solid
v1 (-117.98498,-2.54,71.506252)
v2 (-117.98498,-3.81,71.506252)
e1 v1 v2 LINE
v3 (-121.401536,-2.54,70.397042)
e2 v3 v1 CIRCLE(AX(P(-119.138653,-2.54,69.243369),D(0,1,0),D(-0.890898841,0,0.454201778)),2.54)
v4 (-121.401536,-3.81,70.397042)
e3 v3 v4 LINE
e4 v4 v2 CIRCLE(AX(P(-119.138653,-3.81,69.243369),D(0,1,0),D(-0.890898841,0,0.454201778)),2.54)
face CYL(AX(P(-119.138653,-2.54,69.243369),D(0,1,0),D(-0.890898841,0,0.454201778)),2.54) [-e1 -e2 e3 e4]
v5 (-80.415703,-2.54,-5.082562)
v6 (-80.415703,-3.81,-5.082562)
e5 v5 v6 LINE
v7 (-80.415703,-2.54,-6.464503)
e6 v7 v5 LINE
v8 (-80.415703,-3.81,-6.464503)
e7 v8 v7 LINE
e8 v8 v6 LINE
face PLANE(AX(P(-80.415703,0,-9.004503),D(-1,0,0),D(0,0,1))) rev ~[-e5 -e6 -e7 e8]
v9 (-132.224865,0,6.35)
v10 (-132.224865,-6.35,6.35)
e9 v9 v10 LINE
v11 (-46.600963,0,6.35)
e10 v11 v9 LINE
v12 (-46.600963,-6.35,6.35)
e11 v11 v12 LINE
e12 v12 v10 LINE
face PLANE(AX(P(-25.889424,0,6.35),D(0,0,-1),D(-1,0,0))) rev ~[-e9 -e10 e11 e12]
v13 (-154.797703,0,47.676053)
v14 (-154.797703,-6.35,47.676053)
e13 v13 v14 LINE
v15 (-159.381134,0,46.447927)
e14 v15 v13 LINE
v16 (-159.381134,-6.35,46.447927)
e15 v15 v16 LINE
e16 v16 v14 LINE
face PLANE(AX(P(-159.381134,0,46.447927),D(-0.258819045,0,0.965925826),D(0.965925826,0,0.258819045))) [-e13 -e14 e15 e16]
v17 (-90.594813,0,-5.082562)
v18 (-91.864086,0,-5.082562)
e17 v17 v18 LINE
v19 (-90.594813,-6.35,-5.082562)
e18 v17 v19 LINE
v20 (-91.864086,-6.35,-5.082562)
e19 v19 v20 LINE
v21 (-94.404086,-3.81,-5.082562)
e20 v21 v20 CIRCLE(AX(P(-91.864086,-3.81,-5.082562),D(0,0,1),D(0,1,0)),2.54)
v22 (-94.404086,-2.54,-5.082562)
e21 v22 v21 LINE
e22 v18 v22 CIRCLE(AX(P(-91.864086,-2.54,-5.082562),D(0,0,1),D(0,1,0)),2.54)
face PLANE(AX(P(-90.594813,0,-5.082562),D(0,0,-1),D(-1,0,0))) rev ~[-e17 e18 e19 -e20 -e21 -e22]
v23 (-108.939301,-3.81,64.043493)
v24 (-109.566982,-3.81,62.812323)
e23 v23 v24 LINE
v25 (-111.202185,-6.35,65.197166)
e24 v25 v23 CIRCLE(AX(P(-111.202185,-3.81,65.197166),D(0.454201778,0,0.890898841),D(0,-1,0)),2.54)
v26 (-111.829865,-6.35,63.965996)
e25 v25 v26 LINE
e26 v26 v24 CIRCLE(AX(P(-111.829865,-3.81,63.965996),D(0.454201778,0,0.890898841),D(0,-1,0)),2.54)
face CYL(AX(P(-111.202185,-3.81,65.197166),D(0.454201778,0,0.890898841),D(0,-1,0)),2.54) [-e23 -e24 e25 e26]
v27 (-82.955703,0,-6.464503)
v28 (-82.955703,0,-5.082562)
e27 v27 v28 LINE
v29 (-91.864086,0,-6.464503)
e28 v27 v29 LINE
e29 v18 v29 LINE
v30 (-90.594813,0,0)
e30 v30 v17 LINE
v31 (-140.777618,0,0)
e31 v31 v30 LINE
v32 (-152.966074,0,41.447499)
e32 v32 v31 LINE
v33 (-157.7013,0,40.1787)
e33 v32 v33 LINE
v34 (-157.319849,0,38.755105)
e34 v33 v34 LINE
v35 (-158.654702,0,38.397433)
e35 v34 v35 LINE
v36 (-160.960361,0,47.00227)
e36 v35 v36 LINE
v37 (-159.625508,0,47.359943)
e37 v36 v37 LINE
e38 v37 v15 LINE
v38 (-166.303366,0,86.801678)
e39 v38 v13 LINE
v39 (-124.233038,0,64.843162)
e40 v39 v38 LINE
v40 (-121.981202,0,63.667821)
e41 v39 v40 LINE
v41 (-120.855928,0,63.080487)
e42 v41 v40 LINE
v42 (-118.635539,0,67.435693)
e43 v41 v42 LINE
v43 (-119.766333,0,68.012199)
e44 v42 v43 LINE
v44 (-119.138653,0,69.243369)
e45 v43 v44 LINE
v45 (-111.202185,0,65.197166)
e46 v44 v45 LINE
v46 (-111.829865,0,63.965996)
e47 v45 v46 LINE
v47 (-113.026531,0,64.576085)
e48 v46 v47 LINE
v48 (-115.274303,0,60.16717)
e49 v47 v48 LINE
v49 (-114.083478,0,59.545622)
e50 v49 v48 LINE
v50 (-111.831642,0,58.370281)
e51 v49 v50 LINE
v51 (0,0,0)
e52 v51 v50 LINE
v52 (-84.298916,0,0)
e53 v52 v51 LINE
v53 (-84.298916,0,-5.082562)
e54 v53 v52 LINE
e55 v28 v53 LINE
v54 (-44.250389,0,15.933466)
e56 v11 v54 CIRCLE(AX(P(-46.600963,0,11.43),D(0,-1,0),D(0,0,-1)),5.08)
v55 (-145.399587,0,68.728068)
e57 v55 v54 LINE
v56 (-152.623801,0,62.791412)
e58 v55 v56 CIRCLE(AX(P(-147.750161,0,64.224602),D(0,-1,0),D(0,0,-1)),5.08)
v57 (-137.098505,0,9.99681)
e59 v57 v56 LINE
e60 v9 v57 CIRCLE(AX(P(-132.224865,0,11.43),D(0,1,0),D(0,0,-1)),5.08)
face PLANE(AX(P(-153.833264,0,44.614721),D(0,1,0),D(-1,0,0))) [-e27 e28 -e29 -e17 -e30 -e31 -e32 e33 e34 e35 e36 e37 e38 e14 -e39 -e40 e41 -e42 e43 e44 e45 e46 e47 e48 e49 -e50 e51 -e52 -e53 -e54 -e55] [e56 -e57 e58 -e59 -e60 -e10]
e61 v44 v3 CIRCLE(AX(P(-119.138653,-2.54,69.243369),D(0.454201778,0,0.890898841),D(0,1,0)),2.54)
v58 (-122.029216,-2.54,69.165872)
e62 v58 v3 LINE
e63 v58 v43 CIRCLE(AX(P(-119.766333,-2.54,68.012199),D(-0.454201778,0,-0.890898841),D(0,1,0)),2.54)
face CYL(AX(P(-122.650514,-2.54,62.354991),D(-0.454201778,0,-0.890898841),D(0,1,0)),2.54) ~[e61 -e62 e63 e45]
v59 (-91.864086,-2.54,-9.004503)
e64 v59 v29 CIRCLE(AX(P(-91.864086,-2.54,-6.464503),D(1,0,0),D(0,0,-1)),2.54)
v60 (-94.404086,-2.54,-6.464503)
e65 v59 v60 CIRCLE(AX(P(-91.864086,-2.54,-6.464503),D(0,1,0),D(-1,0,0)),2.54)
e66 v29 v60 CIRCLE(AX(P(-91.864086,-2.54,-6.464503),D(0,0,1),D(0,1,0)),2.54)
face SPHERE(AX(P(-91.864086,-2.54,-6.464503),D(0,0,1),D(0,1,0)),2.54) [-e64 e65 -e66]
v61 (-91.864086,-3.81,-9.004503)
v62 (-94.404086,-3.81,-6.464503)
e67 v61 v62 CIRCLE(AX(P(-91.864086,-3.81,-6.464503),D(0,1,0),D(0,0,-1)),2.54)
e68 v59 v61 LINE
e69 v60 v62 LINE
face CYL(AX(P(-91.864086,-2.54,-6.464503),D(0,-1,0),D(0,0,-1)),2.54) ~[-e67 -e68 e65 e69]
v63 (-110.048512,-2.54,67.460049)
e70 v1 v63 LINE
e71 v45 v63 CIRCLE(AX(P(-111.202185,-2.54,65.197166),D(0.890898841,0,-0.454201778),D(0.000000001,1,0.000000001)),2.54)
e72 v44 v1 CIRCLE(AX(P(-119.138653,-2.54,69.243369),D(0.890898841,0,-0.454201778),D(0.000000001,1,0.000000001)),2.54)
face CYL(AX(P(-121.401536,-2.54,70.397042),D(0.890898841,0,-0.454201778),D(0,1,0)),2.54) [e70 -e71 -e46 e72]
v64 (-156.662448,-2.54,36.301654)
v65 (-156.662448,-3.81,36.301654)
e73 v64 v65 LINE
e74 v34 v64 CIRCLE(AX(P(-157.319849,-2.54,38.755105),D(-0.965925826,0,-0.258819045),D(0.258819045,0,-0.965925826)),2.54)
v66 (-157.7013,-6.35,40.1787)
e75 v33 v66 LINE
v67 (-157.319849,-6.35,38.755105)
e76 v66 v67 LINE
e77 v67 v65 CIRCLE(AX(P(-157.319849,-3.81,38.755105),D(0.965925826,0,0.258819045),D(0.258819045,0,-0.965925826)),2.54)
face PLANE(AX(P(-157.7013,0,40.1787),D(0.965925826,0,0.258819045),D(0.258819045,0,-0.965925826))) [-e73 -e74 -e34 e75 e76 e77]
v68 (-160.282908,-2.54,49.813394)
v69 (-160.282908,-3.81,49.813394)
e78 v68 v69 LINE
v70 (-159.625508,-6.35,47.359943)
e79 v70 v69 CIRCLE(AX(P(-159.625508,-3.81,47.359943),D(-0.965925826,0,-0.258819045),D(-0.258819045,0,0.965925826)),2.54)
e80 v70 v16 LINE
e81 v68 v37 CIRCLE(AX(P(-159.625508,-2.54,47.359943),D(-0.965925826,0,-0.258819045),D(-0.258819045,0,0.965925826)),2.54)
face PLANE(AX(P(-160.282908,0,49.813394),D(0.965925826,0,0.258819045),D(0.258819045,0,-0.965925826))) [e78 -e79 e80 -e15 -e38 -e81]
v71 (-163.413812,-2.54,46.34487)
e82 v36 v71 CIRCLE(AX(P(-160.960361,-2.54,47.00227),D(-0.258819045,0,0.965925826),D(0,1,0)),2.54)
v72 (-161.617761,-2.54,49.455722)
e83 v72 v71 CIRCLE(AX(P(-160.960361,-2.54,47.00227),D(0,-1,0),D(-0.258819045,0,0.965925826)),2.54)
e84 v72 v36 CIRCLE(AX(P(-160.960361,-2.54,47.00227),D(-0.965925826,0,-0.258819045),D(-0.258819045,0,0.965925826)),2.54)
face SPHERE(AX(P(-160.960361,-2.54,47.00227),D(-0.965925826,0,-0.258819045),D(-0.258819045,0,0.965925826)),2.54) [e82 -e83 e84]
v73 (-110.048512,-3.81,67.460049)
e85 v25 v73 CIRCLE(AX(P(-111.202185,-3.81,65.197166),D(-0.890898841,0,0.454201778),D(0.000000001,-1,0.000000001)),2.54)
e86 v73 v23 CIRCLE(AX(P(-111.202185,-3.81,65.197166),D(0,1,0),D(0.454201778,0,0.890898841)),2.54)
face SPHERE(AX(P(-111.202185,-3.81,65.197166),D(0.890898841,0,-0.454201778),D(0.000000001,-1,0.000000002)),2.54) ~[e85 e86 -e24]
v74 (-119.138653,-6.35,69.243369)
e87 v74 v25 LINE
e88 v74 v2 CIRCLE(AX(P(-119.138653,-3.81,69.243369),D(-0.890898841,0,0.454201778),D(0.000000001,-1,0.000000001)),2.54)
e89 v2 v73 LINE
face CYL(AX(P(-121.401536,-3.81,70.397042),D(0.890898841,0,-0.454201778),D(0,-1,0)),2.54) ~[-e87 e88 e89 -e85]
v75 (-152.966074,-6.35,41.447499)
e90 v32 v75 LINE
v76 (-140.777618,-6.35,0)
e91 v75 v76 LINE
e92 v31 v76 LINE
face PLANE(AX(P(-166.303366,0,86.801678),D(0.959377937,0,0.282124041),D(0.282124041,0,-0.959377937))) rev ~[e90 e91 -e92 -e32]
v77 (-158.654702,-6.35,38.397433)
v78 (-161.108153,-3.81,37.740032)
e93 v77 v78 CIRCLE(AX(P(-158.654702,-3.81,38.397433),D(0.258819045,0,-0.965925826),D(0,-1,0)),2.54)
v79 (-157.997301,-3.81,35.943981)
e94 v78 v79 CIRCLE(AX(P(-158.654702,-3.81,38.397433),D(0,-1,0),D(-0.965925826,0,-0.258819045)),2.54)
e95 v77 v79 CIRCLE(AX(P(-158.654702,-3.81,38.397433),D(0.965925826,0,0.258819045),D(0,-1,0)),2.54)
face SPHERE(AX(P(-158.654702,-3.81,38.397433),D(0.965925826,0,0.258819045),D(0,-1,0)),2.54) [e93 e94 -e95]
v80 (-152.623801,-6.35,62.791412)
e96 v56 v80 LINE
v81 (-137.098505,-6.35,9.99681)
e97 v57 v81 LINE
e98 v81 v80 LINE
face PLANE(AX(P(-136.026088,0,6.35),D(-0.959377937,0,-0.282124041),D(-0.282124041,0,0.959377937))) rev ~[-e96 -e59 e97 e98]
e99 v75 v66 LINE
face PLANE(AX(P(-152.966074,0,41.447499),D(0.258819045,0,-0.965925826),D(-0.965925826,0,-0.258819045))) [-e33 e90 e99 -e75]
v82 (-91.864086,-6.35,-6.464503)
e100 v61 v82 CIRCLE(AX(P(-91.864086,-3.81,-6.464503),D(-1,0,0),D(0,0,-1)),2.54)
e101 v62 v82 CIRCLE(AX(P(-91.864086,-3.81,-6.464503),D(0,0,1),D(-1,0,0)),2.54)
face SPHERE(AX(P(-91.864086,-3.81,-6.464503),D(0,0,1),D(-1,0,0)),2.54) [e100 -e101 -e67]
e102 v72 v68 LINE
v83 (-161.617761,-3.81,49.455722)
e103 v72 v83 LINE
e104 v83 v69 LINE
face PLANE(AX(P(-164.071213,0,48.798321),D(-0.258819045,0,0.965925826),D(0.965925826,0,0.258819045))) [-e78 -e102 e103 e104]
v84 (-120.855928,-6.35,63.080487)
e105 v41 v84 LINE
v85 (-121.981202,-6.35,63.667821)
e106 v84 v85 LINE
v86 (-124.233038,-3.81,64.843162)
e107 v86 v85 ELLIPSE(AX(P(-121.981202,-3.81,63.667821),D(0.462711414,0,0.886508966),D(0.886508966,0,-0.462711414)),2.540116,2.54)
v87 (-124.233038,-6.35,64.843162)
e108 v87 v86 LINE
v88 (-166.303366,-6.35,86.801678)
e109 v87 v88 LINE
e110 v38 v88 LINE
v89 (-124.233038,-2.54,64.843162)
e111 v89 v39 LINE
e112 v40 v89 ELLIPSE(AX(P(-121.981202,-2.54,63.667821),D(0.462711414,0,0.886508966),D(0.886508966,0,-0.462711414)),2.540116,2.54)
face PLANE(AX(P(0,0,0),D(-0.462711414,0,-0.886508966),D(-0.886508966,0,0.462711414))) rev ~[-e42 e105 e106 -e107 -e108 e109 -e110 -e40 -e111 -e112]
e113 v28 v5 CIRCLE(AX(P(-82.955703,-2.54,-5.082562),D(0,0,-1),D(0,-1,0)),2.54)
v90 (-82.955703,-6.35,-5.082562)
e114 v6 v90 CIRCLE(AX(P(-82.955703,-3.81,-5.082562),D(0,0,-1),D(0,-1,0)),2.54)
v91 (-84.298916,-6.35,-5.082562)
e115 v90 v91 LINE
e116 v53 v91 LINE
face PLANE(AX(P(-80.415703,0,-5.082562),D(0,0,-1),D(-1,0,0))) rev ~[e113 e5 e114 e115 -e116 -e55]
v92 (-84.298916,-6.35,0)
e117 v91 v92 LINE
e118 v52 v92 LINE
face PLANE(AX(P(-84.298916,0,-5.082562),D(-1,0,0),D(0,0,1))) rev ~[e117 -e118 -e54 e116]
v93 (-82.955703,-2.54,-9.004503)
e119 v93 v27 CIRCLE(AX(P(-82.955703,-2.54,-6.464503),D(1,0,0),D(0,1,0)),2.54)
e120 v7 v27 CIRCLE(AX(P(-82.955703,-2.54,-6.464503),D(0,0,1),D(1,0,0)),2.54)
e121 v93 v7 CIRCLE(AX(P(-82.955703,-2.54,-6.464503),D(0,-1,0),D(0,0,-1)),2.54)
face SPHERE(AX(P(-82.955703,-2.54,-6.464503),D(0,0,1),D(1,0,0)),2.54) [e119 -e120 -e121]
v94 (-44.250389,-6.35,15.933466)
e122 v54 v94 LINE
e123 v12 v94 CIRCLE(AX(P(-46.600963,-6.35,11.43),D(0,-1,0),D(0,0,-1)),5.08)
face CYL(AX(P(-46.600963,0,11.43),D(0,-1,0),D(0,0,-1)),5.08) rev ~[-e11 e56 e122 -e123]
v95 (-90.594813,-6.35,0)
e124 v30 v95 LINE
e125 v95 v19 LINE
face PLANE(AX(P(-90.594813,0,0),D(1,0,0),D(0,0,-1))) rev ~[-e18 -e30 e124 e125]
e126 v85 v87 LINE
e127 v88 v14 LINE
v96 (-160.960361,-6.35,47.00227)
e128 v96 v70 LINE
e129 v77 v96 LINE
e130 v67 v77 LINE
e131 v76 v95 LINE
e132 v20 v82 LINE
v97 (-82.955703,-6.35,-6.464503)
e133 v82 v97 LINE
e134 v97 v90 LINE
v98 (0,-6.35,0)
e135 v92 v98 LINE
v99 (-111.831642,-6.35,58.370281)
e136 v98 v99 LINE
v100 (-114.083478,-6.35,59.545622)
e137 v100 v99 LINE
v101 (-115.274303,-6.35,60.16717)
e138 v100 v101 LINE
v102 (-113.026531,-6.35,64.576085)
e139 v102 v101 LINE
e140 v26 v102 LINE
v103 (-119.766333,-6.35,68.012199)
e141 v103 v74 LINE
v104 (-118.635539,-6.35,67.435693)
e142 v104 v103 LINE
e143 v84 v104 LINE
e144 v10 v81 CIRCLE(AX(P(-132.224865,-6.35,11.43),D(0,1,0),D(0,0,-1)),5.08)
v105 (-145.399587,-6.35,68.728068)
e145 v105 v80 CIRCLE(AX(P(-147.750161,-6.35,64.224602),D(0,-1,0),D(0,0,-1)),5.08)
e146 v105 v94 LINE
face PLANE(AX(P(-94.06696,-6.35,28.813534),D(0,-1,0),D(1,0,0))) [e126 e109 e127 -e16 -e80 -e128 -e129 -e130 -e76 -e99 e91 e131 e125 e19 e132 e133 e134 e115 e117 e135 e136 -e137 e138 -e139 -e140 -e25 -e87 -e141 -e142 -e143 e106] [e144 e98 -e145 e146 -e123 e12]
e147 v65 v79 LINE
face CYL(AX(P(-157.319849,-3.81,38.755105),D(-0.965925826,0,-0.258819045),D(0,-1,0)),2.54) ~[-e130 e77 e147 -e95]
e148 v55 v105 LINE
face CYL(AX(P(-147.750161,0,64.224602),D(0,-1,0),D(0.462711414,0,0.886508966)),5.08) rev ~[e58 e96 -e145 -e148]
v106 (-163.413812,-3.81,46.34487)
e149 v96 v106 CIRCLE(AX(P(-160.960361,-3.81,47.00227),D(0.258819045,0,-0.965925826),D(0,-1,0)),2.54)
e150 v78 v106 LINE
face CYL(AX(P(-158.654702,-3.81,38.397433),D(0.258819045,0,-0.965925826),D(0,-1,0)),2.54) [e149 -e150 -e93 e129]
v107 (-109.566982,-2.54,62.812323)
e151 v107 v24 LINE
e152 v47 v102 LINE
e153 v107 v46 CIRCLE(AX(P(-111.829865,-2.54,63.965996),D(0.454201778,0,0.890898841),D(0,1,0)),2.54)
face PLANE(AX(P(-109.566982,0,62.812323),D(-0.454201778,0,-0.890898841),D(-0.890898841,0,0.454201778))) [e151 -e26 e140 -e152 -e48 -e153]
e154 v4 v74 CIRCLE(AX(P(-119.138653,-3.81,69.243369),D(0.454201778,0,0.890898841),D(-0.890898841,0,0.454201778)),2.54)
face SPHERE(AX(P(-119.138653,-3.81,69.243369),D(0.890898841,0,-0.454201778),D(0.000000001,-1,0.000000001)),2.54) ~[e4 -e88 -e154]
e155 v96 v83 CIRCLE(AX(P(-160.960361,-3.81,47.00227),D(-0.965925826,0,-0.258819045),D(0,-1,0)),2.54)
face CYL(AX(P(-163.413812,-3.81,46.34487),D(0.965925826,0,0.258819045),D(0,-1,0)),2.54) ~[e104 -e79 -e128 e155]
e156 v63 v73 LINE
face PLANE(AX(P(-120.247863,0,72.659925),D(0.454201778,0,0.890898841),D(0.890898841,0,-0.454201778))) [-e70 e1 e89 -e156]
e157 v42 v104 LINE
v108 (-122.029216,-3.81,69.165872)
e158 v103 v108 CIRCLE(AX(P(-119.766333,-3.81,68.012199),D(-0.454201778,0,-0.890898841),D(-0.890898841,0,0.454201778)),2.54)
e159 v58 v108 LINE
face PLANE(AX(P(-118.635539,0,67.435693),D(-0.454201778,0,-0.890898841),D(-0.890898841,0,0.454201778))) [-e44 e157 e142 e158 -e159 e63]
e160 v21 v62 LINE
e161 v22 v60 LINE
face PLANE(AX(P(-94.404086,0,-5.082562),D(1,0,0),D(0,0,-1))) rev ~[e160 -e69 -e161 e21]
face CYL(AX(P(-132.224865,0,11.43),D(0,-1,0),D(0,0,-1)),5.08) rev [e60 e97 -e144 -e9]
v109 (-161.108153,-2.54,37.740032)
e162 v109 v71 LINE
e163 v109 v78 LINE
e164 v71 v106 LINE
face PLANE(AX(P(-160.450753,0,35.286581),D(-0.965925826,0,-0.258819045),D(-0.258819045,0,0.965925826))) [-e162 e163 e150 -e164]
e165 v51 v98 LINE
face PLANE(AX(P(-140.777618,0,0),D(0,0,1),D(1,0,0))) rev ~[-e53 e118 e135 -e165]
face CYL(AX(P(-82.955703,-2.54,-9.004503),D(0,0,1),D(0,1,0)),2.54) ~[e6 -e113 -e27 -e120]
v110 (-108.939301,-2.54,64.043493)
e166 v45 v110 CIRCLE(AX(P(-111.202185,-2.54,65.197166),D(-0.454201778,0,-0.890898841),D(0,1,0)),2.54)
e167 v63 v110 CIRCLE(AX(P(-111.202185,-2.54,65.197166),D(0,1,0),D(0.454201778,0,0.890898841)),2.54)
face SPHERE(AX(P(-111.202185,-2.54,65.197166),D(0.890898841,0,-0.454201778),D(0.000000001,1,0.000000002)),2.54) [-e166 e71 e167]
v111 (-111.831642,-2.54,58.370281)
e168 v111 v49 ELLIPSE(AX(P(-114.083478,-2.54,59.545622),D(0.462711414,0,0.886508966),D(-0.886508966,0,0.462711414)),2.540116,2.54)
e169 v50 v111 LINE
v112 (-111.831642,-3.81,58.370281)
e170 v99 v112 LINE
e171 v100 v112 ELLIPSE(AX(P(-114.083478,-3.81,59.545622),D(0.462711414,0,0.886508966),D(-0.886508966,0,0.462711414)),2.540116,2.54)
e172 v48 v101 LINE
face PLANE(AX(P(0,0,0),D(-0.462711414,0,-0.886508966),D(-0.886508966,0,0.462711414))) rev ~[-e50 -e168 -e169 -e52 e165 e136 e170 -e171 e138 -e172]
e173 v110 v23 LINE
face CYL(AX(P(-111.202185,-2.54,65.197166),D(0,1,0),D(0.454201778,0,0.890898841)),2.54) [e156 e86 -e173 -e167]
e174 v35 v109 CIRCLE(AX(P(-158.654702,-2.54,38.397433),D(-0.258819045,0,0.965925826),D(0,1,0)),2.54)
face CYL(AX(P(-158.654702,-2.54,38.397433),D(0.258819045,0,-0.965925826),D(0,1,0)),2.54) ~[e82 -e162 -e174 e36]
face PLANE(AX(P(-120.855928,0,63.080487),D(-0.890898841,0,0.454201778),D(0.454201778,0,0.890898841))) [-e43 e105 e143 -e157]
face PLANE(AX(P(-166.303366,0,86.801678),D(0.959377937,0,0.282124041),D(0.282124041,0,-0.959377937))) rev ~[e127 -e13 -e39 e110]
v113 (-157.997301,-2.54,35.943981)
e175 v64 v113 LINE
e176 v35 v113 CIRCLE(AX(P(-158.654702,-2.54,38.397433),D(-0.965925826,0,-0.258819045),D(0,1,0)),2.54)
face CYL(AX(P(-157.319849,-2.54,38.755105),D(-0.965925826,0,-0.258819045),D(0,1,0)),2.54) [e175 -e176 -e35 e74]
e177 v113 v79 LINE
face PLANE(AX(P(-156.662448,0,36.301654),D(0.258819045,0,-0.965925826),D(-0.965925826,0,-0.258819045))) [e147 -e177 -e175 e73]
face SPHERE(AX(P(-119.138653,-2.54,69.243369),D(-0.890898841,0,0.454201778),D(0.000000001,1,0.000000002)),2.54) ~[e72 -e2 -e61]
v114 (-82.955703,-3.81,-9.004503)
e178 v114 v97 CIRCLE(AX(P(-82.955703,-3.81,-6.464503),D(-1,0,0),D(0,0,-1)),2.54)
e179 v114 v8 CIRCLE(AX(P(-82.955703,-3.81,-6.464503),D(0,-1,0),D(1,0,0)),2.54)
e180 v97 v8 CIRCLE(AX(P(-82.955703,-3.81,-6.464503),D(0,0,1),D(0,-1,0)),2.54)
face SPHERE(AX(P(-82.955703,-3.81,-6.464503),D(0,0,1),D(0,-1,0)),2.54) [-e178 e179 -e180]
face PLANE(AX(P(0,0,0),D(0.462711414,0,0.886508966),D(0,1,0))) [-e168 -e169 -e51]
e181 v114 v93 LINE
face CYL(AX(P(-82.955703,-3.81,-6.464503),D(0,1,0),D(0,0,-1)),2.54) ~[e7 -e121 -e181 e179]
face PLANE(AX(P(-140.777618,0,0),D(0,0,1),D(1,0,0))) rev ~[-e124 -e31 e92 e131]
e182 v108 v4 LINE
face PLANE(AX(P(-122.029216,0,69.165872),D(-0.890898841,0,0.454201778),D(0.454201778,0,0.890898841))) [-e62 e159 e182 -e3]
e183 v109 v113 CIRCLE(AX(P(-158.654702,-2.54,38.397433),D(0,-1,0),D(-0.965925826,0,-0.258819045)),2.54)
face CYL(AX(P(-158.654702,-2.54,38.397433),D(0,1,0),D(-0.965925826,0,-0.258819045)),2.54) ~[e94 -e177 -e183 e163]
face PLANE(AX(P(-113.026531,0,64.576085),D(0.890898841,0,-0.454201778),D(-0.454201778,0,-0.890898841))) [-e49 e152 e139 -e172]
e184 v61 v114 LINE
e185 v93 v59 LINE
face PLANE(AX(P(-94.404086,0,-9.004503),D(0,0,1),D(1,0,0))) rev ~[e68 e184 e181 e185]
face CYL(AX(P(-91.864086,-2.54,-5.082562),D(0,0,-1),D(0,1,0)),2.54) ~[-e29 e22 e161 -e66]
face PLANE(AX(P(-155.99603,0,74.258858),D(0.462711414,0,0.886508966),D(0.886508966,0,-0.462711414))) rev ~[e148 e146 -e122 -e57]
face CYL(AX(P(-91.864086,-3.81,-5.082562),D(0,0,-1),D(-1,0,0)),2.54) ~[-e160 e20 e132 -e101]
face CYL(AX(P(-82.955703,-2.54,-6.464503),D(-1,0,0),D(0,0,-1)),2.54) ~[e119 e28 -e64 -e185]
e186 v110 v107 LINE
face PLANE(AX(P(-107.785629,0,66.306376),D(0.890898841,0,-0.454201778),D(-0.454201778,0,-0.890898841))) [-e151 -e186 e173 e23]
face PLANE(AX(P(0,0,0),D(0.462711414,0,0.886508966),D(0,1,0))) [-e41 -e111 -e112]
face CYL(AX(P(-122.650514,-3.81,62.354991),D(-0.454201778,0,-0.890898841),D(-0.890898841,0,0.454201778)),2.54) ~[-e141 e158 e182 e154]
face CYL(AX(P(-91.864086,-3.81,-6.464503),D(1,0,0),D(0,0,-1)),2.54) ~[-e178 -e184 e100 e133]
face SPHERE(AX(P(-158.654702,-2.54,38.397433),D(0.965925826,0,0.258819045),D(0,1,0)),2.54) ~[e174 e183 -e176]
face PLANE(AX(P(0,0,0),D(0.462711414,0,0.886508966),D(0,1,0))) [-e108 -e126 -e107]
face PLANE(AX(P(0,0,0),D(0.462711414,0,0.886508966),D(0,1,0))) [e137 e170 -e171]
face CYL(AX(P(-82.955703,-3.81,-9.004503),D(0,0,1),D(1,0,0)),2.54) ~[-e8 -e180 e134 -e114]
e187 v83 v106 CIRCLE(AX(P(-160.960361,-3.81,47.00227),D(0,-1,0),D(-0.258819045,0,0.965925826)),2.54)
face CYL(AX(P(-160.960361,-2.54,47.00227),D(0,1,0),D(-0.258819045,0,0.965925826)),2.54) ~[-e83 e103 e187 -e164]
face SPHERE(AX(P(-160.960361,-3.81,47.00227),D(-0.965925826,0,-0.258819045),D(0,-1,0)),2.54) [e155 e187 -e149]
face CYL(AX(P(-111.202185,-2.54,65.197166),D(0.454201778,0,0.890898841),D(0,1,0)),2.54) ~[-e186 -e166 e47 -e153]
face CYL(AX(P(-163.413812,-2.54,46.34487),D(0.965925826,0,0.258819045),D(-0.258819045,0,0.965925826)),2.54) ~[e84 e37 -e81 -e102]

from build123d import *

# Parameters (mm, degrees)
F1_DEPTH      = 6.35
F2_R          = 5.08
F4_DEPTH      = 6.35
F5_R          = 2.54
F6_R          = 2.54
F7_R          = 2.54
F8_R          = 2.54
F10_DEPTH     = 6.35
F11_R         = 2.54
F12_R         = 2.54
F13_T1_DEPTH  = 8.9083831143
F13_T3_DEPTH  = 1.27
F13_T6_ANGLE  = 90
F13_T8_ANGLE  = 90
F13_T10_ANGLE = 90
F13_T12_ANGLE = 90
F15_DEPTH     = 6.35
F16_R         = 2.54
F17_T1_DEPTH  = 1.27
F17_T4_ANGLE  = 90
F17_T6_ANGLE  = 90
F17_T10_DEPTH = 7.7319413884
F17_T15_DEPTH = 7.7319413884
F18_T1_DEPTH  = 1.27
F18_T4_ANGLE  = 90
F18_T8_DEPTH  = 7.7319413884
F18_T13_DEPTH = 7.7319413884
F18_T16_ANGLE = 90


# Not quite as in the source:
# - a fillet or chamfer that OpenCascade refuses, or shapes differently, is made with other operations: its cross-section is extruded or revolved along the edge and cut away or added


with BuildPart() as f1:
    # F0 (on Front) → F1 (new body)
    with BuildSketch(Plane.XZ):
        Polygon((-140.7776176929, 0), (0, 0), (-166.3033664227, 86.8016779423), align=None)
        Polygon((-136.0260884312, 6.35), (-155.9960301785, 74.2588582448), (-25.8894239036, 6.35), align=None, mode=Mode.SUBTRACT)
    extrude(amount=F1_DEPTH)

    # F2
    f2_edges = [f1.edges().sort_by_distance(p)[0] for p in [
        (-155.99603, -3.175, 74.258858),
        (-25.889424, -3.175, 6.35),
        (-136.026088, -3.175, 6.35),
    ]]
    fillet(f2_edges, radius=F2_R)

    # F3 (on Front) → F4 (join)
    with BuildSketch(Plane.XZ):
        Polygon((-84.2989161611, 0), (-90.5948132277, 0), (-90.5948132277, -5.0825621001), (-94.4040864706, -5.0825621001), (-94.4040864706, -9.0045034885), (-80.4157033563, -9.0045034885), (-80.4157033563, -5.0825621001), (-84.2989161611, -5.0825621001), align=None)
    extrude(amount=F4_DEPTH)

    # F5
    f5_edges = [f1.edges().sort_by_distance(p)[0] for p in [
        (-80.415703, 0, -7.043533),
    ]]
    fillet(f5_edges, radius=F5_R)

    # F6
    f6_edges = [f1.edges().sort_by_distance(p)[0] for p in [
        (-94.404086, 0, -7.043533),
    ]]
    fillet(f6_edges, radius=F6_R)

    # F7
    f7_edges = [f1.edges().sort_by_distance(p)[0] for p in [
        (-94.404086, -6.35, -7.043533),
        (-80.415703, -6.35, -7.043533),
    ]]
    fillet(f7_edges, radius=F7_R)

    # F8
    f8_edges = [f1.edges().sort_by_distance(p)[0] for p in [
        (-87.409895, -6.35, -9.004503),
        (-87.409895, 0, -9.004503),
    ]]
    fillet(f8_edges, radius=F8_R)

    # F9 (on face) → F10 (join)
    with BuildSketch(Plane(origin=(0, 0, 0), x_dir=(-1, 0, 0), z_dir=(0, 1, 0))):
        Polygon((154.6036799573, 47.7280417937), (152.9238455726, 41.4588145216), (152.9660739724, 41.4474994559), (154.7977033408, 47.6760533848), align=None)
        Polygon((154.7977033408, 47.6760533848), (152.9660739724, 41.4474994559), (157.7012996051, 40.1786995717), (156.6624483483, 36.3016538997), (160.4507528245, 35.2865807746), (164.0712127847, 48.7983212928), (160.2829083085, 49.8133944179), (159.3811339898, 46.4479268438), align=None)
    extrude(amount=-F10_DEPTH)

    # F11
    f11_edges = [f1.edges().sort_by_distance(p)[0] for p in [
        (-162.177061, -6.35, 49.305858),
        (-158.556601, -6.35, 35.794117),
    ]]
    fillet(f11_edges, radius=F11_R)

    # F12
    f12_edges = [f1.edges().sort_by_distance(p)[0] for p in [
        (-162.177061, 0, 49.305858),
        (-158.556601, 0, 35.794117),
    ]]
    fillet(f12_edges, radius=F12_R)

    # F13: fillet of radius 2.54 on 6 edges, made by hand

    # F13_s2 → F13_t1 (cut)
    with BuildSketch(Plane(origin=(-20.2272079793, 0, 75.488967874), x_dir=(0, 1, 0), z_dir=(-0.2588190451, 0, 0.9659258263))):
        with BuildLine():
            ThreePointArc((0, 143.3106868597), (-0.7439487758, 145.1067380839), (-2.54, 145.8506868597))
            Line((-2.54, 145.8506868597), (0, 145.8506868597))
            Line((0, 145.8506868597), (0, 143.3106868597))
        make_face()
        with BuildLine():
            ThreePointArc((-6.35, 143.3106868597), (-5.6060512242, 145.1067380839), (-3.81, 145.8506868597))
            Line((-3.81, 145.8506868597), (-6.35, 145.8506868597))
            Line((-6.35, 145.8506868597), (-6.35, 143.3106868597))
        make_face()
    extrude(amount=F13_T1_DEPTH, mode=Mode.SUBTRACT)

    # F13_s4 → F13_t3 (cut)
    with BuildSketch(Plane.XZ.offset(2.54)):
        with BuildLine():
            ThreePointArc((-161.1081531991, 37.7400323734), (-159.9247016003, 36.1977282224), (-157.9973012258, 35.9439811492))
            Line((-157.9973012258, 35.9439811492), (-160.4507528245, 35.2865807746))
            Line((-160.4507528245, 35.2865807746), (-161.1081531991, 37.7400323734))
        make_face()
        with BuildLine():
            ThreePointArc((-161.617761186, 49.4557216674), (-163.160065337, 48.2722700686), (-163.4138124102, 46.344869694))
            Line((-163.4138124102, 46.344869694), (-164.0712127847, 48.7983212928))
            Line((-164.0712127847, 48.7983212928), (-161.617761186, 49.4557216674))
        make_face()
    extrude(amount=F13_T3_DEPTH, mode=Mode.SUBTRACT)

    # F13_s5 → F13_t6 (revolve, cut)
    with BuildSketch(Plane.XZ.offset(2.54)):
        with BuildLine():
            ThreePointArc((-161.617761186, 49.4557216674), (-163.160065337, 48.2722700686), (-163.4138124102, 46.344869694))
            Line((-163.4138124102, 46.344869694), (-164.0712127847, 48.7983212928))
            Line((-164.0712127847, 48.7983212928), (-161.617761186, 49.4557216674))
        make_face()
    revolve(axis=Axis((-163.4138124102, -2.54, 46.344869694), (-0.9659258263, 0, -0.2588190451)), revolution_arc=F13_T6_ANGLE, mode=Mode.SUBTRACT)

    # F13_s7 → F13_t8 (revolve, cut)
    with BuildSketch(Plane(origin=(-22.5328671904, 0, 84.0938051946), x_dir=(0, 1, 0), z_dir=(0.2588190451, 0, -0.9659258263))):
        with BuildLine():
            ThreePointArc((-6.35, -143.3106868597), (-5.6060512242, -145.1067380839), (-3.81, -145.8506868597))
            Line((-3.81, -145.8506868597), (-6.35, -145.8506868597))
            Line((-6.35, -145.8506868597), (-6.35, -143.3106868597))
        make_face()
    revolve(axis=Axis((-163.4138124102, -3.81, 46.344869694), (-0.9659258263, 0, -0.2588190451)), revolution_arc=F13_T8_ANGLE, mode=Mode.SUBTRACT)

    # F13_s9 → F13_t10 (revolve, cut)
    with BuildSketch(Plane(origin=(-20.2272079793, 0, 75.488967874), x_dir=(0, 1, 0), z_dir=(-0.2588190451, 0, 0.9659258263))):
        with BuildLine():
            ThreePointArc((-3.81, 145.8506868597), (-5.6060512242, 145.1067380839), (-6.35, 143.3106868597))
            Line((-6.35, 143.3106868597), (-6.35, 145.8506868597))
            Line((-6.35, 145.8506868597), (-3.81, 145.8506868597))
        make_face()
    revolve(axis=Axis((-161.1081531991, -3.81, 37.7400323734), (0.9659258263, 0, 0.2588190451)), revolution_arc=F13_T10_ANGLE, mode=Mode.SUBTRACT)

    # F13_s11 → F13_t12 (revolve, cut)
    with BuildSketch(Plane(origin=(-20.2272079793, 0, 75.488967874), x_dir=(0, 1, 0), z_dir=(-0.2588190451, 0, 0.9659258263))):
        with BuildLine():
            ThreePointArc((-2.54, 145.8506868597), (-0.7439487758, 145.1067380839), (0, 143.3106868597))
            Line((0, 143.3106868597), (0, 145.8506868597))
            Line((0, 145.8506868597), (-2.54, 145.8506868597))
        make_face()
    revolve(axis=Axis((-161.1081531991, -2.54, 37.7400323734), (-0.9659258263, 0, -0.2588190451)), revolution_arc=F13_T12_ANGLE, mode=Mode.SUBTRACT)

    # F14 (on face) → F15 (join)
    with BuildSketch(Plane(origin=(0, 0, 0), x_dir=(-1, 0, 0), z_dir=(0, 1, 0))):
        Polygon((115.2743030785, 60.1671700704), (120.8559281551, 63.0804870568), (118.6355388683, 67.435692909), (122.0292159852, 69.1658715892), (120.2478632331, 72.6599246264), (107.7856289299, 66.3063761433), (109.5669816821, 62.8123231061), (113.026531469, 64.5760852667), align=None)
    extrude(amount=-F15_DEPTH)

    # F16
    f16_edges = [f1.edges().sort_by_distance(p)[0] for p in [
        (-114.016746, -6.35, 69.48315),
        (-114.016746, 0, 69.48315),
    ]]
    fillet(f16_edges, radius=F16_R)

    # F17: fillet of radius 2.54 on 4 edges, made by hand

    # F17_s2 → F17_t1 (cut)
    with BuildSketch(Plane.XZ.offset(2.54)):
        with BuildLine():
            ThreePointArc((-121.4015357494, 70.3970415704), (-119.9229829878, 71.6592386675), (-117.9849801771, 71.50625211))
            Line((-117.9849801771, 71.50625211), (-120.2478632331, 72.6599246264))
            Line((-120.2478632331, 72.6599246264), (-121.4015357494, 70.3970415704))
        make_face()
    extrude(amount=F17_T1_DEPTH, mode=Mode.SUBTRACT)

    # F17_s3 → F17_t4 (revolve, cut)
    with BuildSketch(Plane(origin=(3.4409642411, 0, 6.7493153968), x_dir=(0, 1, 0), z_dir=(-0.4542017781, 0, -0.8908988409))):
        with BuildLine():
            ThreePointArc((0, -137.5909489404), (-0.7439487758, -139.3870001646), (-2.54, -140.1309489404))
            Line((-2.54, -140.1309489404), (0, -140.1309489404))
            Line((0, -140.1309489404), (0, -137.5909489404))
        make_face()
    revolve(axis=Axis((-121.4015357494, -2.54, 70.3970415704), (0.8908988409, 0, -0.4542017781)), revolution_arc=F17_T4_ANGLE, mode=Mode.SUBTRACT)

    # F17_s5 → F17_t6 (revolve, cut)
    with BuildSketch(Plane(origin=(3.4409642411, 0, 6.7493153968), x_dir=(0, 1, 0), z_dir=(-0.4542017781, 0, -0.8908988409))):
        with BuildLine():
            ThreePointArc((-3.81, -140.1309489404), (-5.6060512242, -139.3870001646), (-6.35, -137.5909489404))
            Line((-6.35, -137.5909489404), (-6.35, -140.1309489404))
            Line((-6.35, -140.1309489404), (-3.81, -140.1309489404))
        make_face()
    revolve(axis=Axis((-121.4015357494, -3.81, 70.3970415704), (-0.8908988409, 0, 0.4542017781)), revolution_arc=F17_T6_ANGLE, mode=Mode.SUBTRACT)


with BuildPart() as f17_tool8:
    # F17_s9 → F17_t10 (new body)
    with BuildSketch(Plane(origin=(-0.0708972856, 0, -0.1390622243), x_dir=(0, 1, 0), z_dir=(0.4542017781, 0, 0.8908988409))):
        with BuildLine():
            ThreePointArc((-3.81, 140.1309489404), (-5.6060512242, 139.3870001646), (-6.35, 137.5909489404))
            Line((-6.35, 137.5909489404), (-6.35, 140.1309489404))
            Line((-6.35, 140.1309489404), (-3.81, 140.1309489404))
        make_face()
    extrude(amount=F17_T10_DEPTH)

    split(bisect_by=Plane(origin=(0, 0, 0), x_dir=(0, 1, 0), z_dir=(0.4627114138, 0, 0.8865089664)), keep=Keep.TOP)


with BuildPart() as f1_1:
    add(f1.part)

    # F17_t7: cut F17_tool8
    add(f17_tool8.part, mode=Mode.SUBTRACT)


with BuildPart() as f17_tool13:
    # F17_s14 → F17_t15 (new body)
    with BuildSketch(Plane(origin=(-0.0708972856, 0, -0.1390622243), x_dir=(0, 1, 0), z_dir=(0.4542017781, 0, 0.8908988409))):
        with BuildLine():
            ThreePointArc((0, 137.5909489404), (-0.7439487758, 139.3870001646), (-2.54, 140.1309489404))
            Line((-2.54, 140.1309489404), (0, 140.1309489404))
            Line((0, 140.1309489404), (0, 137.5909489404))
        make_face()
    extrude(amount=F17_T15_DEPTH)

    split(bisect_by=Plane(origin=(0, 0, 0), x_dir=(0, 1, 0), z_dir=(0.4627114138, 0, 0.8865089664)), keep=Keep.TOP)


with BuildPart() as f1_2:
    add(f1_1.part)

    # F17_t12: cut F17_tool13
    add(f17_tool13.part, mode=Mode.SUBTRACT)

    # F18: fillet of radius 2.54 on 5 edges, made by hand

    # F18_s2 → F18_t1 (cut)
    with BuildSketch(Plane.XZ.offset(2.54)):
        with BuildLine():
            ThreePointArc((-110.0485119859, 67.4600486596), (-108.7863148888, 65.981495898), (-108.9393014463, 64.0434930873))
            Line((-108.9393014463, 64.0434930873), (-107.7856289299, 66.3063761433))
            Line((-107.7856289299, 66.3063761433), (-110.0485119859, 67.4600486596))
        make_face()
    extrude(amount=F18_T1_DEPTH, mode=Mode.SUBTRACT)

    # F18_s3 → F18_t4 (revolve, cut)
    with BuildSketch(Plane(origin=(3.4409642411, 0, 6.7493153968), x_dir=(0, 1, 0), z_dir=(-0.4542017781, 0, -0.8908988409))):
        with BuildLine():
            ThreePointArc((0, -128.6825658261), (-0.7439487758, -126.8865146019), (-2.54, -126.1425658261))
            Line((-2.54, -126.1425658261), (0, -126.1425658261))
            Line((0, -126.1425658261), (0, -128.6825658261))
        make_face()
    revolve(axis=Axis((-108.9393014463, -2.54, 64.0434930873), (0.8908988409, 0, -0.4542017781)), revolution_arc=F18_T4_ANGLE, mode=Mode.SUBTRACT)


with BuildPart() as f18_tool6:
    # F18_s7 → F18_t8 (new body)
    with BuildSketch(Plane(origin=(3.4409642411, 0, 6.7493153968), x_dir=(0, 1, 0), z_dir=(-0.4542017781, 0, -0.8908988409))):
        with BuildLine():
            ThreePointArc((0, -128.6825658261), (-0.7439487758, -126.8865146019), (-2.54, -126.1425658261))
            Line((-2.54, -126.1425658261), (0, -126.1425658261))
            Line((0, -126.1425658261), (0, -128.6825658261))
        make_face()
    extrude(amount=F18_T8_DEPTH)

    split(bisect_by=Plane(origin=(0, 0, 0), x_dir=(0, 1, 0), z_dir=(0.4627114138, 0, 0.8865089664)), keep=Keep.TOP)


with BuildPart() as f1_3:
    add(f1_2.part)

    # F18_t5: cut F18_tool6
    add(f18_tool6.part, mode=Mode.SUBTRACT)


with BuildPart() as f18_tool11:
    # F18_s12 → F18_t13 (new body)
    with BuildSketch(Plane(origin=(3.4409642411, 0, 6.7493153968), x_dir=(0, 1, 0), z_dir=(-0.4542017781, 0, -0.8908988409))):
        with BuildLine():
            ThreePointArc((-6.35, -128.6825658261), (-5.6060512242, -126.8865146019), (-3.81, -126.1425658261))
            Line((-3.81, -126.1425658261), (-6.35, -126.1425658261))
            Line((-6.35, -126.1425658261), (-6.35, -128.6825658261))
        make_face()
    extrude(amount=F18_T13_DEPTH)

    split(bisect_by=Plane(origin=(0, 0, 0), x_dir=(0, 1, 0), z_dir=(0.4627114138, 0, 0.8865089664)), keep=Keep.TOP)


with BuildPart() as f1_4:
    add(f1_3.part)

    # F18_t10: cut F18_tool11
    add(f18_tool11.part, mode=Mode.SUBTRACT)

    # F18_s15 → F18_t16 (revolve, cut)
    with BuildSketch(Plane(origin=(3.4409642411, 0, 6.7493153968), x_dir=(0, 1, 0), z_dir=(-0.4542017781, 0, -0.8908988409))):
        with BuildLine():
            ThreePointArc((-6.35, -128.6825658261), (-5.6060512242, -126.8865146019), (-3.81, -126.1425658261))
            Line((-3.81, -126.1425658261), (-6.35, -126.1425658261))
            Line((-6.35, -126.1425658261), (-6.35, -128.6825658261))
        make_face()
    revolve(axis=Axis((-108.9393014463, -3.81, 64.0434930873), (-0.8908988409, 0, 0.4542017781)), revolution_arc=F18_T16_ANGLE, mode=Mode.SUBTRACT)


solid = f1_4.part
